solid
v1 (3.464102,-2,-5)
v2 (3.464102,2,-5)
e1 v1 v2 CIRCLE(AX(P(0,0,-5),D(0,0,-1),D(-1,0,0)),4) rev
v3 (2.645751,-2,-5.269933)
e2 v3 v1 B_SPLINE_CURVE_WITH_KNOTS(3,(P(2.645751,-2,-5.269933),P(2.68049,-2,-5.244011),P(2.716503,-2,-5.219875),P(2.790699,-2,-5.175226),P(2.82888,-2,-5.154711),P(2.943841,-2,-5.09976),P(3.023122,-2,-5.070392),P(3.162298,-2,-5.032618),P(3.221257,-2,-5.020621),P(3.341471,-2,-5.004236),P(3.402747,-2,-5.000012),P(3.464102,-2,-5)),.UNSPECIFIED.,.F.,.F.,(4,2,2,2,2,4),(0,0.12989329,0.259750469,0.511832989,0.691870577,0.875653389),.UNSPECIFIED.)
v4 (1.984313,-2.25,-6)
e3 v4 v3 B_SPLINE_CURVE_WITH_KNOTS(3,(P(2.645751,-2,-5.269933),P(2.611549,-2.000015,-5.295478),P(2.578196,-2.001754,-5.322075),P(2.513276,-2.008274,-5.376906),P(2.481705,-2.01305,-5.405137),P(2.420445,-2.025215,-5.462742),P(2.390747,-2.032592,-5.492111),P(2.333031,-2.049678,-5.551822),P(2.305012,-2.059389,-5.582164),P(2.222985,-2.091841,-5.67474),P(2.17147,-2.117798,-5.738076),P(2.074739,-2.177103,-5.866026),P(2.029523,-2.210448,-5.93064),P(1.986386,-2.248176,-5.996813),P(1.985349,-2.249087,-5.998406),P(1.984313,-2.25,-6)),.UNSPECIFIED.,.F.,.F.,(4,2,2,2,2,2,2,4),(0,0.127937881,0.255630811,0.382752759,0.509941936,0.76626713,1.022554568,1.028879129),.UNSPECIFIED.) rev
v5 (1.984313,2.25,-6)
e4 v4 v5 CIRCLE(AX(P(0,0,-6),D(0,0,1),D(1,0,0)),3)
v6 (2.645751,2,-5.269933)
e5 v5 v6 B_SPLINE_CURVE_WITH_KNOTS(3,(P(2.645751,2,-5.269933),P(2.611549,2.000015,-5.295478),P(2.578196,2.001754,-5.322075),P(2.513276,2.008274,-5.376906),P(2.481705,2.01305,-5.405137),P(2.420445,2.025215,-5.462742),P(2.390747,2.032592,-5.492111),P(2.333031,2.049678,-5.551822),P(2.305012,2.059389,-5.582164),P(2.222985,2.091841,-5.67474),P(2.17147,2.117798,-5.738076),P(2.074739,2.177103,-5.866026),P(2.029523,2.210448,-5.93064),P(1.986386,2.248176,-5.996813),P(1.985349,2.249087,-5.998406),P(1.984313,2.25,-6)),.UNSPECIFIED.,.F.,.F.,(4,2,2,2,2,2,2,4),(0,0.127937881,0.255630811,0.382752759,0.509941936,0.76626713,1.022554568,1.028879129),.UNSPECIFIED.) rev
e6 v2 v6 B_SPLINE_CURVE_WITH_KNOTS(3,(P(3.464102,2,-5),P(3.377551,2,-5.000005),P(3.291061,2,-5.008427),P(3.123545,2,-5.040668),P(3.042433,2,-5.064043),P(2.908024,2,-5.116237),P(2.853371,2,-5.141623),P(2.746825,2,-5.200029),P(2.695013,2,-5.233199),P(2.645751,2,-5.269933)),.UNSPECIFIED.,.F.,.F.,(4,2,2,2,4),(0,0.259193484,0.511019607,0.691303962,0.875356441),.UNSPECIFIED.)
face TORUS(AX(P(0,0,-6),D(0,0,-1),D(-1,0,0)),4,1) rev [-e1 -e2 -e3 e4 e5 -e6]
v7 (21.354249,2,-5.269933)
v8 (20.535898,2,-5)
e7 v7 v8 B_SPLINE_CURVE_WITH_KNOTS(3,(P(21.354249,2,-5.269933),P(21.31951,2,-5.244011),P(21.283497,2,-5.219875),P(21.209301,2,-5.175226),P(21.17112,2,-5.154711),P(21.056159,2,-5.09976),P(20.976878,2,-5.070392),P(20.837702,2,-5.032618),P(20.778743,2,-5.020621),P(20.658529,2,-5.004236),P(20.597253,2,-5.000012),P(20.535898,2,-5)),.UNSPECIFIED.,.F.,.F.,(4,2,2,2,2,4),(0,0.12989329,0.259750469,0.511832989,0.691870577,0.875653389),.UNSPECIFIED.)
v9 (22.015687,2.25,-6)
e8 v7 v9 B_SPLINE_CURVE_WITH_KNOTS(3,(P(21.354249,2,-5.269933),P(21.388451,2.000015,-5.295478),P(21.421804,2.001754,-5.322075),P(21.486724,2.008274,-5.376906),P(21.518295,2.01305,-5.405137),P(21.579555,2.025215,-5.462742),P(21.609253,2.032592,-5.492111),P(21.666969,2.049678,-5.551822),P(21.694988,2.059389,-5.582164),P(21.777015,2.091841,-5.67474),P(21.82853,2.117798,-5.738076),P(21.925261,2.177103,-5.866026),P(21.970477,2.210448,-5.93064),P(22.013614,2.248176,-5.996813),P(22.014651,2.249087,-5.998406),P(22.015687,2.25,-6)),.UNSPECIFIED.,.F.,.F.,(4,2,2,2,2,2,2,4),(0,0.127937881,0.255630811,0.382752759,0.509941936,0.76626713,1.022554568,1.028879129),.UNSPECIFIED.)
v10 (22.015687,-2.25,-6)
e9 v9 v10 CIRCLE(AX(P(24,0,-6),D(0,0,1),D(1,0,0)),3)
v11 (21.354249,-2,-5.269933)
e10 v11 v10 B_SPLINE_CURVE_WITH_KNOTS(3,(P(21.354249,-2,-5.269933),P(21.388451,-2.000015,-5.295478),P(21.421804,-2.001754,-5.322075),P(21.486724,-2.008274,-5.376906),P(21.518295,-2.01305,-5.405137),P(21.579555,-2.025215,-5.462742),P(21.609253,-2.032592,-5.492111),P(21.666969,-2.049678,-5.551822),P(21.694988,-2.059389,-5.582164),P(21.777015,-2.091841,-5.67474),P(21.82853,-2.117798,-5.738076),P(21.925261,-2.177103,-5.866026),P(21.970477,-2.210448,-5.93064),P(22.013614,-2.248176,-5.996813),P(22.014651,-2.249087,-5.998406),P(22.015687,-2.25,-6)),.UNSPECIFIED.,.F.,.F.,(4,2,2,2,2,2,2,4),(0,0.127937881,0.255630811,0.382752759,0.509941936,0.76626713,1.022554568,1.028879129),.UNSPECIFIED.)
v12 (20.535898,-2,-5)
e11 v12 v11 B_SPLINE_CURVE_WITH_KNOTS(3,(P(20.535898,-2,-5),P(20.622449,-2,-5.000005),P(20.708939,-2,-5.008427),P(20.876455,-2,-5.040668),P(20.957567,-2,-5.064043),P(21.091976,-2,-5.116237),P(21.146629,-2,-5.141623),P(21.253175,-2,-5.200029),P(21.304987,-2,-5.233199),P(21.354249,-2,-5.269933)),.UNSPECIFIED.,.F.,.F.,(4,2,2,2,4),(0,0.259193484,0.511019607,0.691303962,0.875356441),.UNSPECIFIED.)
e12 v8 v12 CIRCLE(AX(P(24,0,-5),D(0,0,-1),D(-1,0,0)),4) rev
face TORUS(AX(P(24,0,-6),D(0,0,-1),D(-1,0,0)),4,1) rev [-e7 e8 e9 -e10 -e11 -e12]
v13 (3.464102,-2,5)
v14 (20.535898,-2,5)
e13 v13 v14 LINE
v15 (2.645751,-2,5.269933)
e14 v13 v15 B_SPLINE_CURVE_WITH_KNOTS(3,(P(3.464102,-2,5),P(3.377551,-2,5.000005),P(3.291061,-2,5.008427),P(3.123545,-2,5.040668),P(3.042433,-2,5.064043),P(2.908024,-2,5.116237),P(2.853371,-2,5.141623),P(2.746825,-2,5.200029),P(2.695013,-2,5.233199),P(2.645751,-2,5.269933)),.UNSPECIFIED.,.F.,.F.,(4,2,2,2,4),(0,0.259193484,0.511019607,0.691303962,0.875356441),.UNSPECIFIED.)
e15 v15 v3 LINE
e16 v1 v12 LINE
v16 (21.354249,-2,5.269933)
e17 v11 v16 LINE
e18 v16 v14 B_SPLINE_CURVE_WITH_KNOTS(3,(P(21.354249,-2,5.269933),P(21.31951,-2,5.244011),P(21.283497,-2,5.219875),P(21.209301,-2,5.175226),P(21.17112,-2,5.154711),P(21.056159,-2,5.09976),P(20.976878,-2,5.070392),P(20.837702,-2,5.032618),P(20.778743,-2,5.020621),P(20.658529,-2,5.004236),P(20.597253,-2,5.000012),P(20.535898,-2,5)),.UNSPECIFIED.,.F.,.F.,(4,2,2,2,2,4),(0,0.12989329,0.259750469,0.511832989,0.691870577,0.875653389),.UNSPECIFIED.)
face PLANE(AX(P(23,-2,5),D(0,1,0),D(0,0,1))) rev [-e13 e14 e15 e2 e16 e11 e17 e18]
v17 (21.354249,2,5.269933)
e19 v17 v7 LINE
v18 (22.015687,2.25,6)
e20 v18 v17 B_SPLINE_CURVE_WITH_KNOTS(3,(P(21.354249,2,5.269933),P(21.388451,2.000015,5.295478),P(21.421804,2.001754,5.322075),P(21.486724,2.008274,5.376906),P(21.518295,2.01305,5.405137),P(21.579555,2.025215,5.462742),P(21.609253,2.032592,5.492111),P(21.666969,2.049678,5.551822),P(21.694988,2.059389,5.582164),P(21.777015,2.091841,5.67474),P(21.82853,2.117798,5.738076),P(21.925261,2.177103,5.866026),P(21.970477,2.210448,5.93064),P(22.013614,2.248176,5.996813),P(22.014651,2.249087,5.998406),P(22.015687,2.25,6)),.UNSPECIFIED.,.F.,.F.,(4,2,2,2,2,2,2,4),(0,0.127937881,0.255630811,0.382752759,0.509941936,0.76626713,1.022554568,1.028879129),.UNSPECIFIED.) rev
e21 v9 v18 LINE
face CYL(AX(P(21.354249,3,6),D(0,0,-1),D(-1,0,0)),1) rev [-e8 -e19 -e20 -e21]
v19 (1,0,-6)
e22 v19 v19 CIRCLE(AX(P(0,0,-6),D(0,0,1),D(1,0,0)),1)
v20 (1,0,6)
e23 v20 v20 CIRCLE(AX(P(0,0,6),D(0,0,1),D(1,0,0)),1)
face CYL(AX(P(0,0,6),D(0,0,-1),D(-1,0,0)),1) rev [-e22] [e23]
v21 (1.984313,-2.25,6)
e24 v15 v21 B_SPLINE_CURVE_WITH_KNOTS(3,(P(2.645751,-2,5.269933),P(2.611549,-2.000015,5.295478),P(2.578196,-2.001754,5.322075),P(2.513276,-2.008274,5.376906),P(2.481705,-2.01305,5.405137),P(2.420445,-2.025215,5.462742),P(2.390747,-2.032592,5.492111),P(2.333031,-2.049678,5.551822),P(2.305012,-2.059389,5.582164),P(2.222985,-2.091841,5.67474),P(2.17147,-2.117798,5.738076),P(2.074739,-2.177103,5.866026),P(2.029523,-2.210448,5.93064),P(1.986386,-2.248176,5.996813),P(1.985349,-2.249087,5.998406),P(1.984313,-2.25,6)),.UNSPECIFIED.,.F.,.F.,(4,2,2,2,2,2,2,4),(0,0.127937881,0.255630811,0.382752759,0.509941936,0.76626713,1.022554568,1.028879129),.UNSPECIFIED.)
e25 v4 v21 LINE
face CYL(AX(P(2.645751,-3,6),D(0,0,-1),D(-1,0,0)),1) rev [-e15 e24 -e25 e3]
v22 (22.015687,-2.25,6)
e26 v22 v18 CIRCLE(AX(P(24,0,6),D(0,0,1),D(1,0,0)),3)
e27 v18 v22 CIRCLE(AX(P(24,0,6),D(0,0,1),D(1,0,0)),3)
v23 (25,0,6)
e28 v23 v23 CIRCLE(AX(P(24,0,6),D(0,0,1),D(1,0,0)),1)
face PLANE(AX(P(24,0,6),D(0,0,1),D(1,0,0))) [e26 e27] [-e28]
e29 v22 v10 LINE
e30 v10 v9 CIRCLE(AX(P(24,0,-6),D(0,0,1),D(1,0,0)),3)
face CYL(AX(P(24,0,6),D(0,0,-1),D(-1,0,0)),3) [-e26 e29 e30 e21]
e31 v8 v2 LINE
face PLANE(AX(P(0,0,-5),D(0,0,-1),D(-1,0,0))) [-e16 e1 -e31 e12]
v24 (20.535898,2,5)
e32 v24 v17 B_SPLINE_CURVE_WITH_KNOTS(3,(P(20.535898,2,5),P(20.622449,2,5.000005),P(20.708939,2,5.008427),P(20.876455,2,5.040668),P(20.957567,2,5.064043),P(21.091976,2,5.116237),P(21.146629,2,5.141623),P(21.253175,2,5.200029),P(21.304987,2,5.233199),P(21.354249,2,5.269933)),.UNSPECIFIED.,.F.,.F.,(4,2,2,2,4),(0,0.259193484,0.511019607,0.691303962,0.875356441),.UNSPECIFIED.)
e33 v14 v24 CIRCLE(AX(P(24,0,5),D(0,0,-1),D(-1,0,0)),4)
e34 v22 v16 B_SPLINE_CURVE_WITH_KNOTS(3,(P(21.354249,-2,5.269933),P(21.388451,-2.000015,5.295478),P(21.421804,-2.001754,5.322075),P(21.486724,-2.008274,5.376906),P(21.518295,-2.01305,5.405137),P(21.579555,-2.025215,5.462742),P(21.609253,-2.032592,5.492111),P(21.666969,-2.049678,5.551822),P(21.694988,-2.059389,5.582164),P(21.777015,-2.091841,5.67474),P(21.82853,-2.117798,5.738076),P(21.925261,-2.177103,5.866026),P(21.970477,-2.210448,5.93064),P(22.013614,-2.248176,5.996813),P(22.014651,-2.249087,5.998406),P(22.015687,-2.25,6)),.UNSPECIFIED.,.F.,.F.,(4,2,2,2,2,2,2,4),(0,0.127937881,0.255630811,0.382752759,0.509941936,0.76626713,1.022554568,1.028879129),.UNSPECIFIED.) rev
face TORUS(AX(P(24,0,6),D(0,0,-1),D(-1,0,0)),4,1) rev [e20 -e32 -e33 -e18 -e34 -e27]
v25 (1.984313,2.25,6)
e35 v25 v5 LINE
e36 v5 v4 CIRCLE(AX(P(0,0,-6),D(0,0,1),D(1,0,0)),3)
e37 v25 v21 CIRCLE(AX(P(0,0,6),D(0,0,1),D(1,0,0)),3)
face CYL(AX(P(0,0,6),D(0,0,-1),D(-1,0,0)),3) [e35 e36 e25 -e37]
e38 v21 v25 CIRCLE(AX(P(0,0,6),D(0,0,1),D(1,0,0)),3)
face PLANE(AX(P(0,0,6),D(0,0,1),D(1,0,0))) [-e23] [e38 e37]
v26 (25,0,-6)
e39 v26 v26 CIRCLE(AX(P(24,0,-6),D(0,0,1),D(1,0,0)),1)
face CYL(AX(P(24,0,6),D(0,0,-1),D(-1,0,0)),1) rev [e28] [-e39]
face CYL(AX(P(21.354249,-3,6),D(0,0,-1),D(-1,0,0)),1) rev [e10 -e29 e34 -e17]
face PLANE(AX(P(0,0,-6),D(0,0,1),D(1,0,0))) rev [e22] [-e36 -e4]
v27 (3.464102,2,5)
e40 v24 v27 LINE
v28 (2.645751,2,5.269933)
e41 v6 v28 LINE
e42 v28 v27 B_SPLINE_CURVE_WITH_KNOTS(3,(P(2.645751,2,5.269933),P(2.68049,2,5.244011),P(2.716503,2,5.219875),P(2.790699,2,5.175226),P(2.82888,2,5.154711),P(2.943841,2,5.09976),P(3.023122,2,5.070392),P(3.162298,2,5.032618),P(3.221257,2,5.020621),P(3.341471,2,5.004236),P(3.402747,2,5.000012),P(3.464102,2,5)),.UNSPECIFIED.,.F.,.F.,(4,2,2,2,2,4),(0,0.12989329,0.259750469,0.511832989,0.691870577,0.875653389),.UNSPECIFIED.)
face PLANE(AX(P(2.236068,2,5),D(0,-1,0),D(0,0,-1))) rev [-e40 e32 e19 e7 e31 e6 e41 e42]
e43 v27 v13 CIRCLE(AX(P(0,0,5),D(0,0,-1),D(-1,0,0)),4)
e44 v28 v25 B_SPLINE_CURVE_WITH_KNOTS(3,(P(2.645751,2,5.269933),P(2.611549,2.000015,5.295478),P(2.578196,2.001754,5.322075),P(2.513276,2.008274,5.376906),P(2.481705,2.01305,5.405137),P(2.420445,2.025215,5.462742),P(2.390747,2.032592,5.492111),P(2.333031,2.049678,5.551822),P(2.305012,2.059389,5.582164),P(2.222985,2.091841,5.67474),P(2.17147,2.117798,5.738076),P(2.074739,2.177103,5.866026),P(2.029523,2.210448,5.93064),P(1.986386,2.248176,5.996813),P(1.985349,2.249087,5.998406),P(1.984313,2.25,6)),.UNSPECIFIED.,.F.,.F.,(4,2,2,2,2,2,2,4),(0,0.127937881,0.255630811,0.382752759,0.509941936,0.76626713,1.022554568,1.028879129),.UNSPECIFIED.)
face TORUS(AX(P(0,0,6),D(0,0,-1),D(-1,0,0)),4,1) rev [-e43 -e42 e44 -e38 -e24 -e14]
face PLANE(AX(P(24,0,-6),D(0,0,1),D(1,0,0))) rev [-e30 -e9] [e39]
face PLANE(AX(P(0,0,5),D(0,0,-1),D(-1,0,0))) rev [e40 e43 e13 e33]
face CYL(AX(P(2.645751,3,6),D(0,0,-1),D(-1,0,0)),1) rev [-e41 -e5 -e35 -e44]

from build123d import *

# Parameters (mm, degrees)
SKETCH_2_R      = 3
SKETCH_2_R_2    = 1
EXTRUDE_1_DEPTH = 6
EXTRUDE_2_DEPTH = 5
SKETCH_6_R      = 3
SKETCH_6_R_2    = 1
EXTRUDE_3_DEPTH = 6
FILLET_1_R      = 1


with BuildPart() as part:
    # Эскиз2 → Бобышка-Вытянуть1 (new, symmetric)
    with BuildSketch(Plane.XY):
        Circle(SKETCH_2_R)
        Circle(SKETCH_2_R_2, mode=Mode.SUBTRACT)
    extrude(amount=EXTRUDE_1_DEPTH, both=True)

    # Эскиз4 → Бобышка-Вытянуть2 (add, symmetric)
    with BuildSketch(Plane.XY):
        with BuildLine():
            Line((2.236067977, 2), (23, 2))
            Line((23, 2), (23, -2))
            Line((23, -2), (2.236067977, -2))
            ThreePointArc((2.236067977, -2), (3, 0), (2.236067977, 2))
        make_face()
    extrude(amount=EXTRUDE_2_DEPTH, both=True)

    # Эскиз6 → Бобышка-Вытянуть3 (add, symmetric)
    with BuildSketch(Plane.XY):
        with Locations((24, 0)):
            Circle(SKETCH_6_R)
        with Locations((24, 0)):
            Circle(SKETCH_6_R_2, mode=Mode.SUBTRACT)
    extrude(amount=EXTRUDE_3_DEPTH, both=True)

    # Скругление1
    fillet_1_edges = [part.edges().sort_by_distance(p)[0] for p in [
        (2.802517077, 1.070466269, -5),
        (2.236067977, 2, 0),
        (2.236067977, -2, 0),
        (2.802517077, 1.070466269, 5),
        (21, 0, -5),
        (21.763932023, 2, 0),
        (21, 0, 5),
        (21.763932023, -2, 0),
    ]]
    fillet(fillet_1_edges, radius=FILLET_1_R - 0.0001)  # a hair under: the kernel refuses the full size


solid = part.part
